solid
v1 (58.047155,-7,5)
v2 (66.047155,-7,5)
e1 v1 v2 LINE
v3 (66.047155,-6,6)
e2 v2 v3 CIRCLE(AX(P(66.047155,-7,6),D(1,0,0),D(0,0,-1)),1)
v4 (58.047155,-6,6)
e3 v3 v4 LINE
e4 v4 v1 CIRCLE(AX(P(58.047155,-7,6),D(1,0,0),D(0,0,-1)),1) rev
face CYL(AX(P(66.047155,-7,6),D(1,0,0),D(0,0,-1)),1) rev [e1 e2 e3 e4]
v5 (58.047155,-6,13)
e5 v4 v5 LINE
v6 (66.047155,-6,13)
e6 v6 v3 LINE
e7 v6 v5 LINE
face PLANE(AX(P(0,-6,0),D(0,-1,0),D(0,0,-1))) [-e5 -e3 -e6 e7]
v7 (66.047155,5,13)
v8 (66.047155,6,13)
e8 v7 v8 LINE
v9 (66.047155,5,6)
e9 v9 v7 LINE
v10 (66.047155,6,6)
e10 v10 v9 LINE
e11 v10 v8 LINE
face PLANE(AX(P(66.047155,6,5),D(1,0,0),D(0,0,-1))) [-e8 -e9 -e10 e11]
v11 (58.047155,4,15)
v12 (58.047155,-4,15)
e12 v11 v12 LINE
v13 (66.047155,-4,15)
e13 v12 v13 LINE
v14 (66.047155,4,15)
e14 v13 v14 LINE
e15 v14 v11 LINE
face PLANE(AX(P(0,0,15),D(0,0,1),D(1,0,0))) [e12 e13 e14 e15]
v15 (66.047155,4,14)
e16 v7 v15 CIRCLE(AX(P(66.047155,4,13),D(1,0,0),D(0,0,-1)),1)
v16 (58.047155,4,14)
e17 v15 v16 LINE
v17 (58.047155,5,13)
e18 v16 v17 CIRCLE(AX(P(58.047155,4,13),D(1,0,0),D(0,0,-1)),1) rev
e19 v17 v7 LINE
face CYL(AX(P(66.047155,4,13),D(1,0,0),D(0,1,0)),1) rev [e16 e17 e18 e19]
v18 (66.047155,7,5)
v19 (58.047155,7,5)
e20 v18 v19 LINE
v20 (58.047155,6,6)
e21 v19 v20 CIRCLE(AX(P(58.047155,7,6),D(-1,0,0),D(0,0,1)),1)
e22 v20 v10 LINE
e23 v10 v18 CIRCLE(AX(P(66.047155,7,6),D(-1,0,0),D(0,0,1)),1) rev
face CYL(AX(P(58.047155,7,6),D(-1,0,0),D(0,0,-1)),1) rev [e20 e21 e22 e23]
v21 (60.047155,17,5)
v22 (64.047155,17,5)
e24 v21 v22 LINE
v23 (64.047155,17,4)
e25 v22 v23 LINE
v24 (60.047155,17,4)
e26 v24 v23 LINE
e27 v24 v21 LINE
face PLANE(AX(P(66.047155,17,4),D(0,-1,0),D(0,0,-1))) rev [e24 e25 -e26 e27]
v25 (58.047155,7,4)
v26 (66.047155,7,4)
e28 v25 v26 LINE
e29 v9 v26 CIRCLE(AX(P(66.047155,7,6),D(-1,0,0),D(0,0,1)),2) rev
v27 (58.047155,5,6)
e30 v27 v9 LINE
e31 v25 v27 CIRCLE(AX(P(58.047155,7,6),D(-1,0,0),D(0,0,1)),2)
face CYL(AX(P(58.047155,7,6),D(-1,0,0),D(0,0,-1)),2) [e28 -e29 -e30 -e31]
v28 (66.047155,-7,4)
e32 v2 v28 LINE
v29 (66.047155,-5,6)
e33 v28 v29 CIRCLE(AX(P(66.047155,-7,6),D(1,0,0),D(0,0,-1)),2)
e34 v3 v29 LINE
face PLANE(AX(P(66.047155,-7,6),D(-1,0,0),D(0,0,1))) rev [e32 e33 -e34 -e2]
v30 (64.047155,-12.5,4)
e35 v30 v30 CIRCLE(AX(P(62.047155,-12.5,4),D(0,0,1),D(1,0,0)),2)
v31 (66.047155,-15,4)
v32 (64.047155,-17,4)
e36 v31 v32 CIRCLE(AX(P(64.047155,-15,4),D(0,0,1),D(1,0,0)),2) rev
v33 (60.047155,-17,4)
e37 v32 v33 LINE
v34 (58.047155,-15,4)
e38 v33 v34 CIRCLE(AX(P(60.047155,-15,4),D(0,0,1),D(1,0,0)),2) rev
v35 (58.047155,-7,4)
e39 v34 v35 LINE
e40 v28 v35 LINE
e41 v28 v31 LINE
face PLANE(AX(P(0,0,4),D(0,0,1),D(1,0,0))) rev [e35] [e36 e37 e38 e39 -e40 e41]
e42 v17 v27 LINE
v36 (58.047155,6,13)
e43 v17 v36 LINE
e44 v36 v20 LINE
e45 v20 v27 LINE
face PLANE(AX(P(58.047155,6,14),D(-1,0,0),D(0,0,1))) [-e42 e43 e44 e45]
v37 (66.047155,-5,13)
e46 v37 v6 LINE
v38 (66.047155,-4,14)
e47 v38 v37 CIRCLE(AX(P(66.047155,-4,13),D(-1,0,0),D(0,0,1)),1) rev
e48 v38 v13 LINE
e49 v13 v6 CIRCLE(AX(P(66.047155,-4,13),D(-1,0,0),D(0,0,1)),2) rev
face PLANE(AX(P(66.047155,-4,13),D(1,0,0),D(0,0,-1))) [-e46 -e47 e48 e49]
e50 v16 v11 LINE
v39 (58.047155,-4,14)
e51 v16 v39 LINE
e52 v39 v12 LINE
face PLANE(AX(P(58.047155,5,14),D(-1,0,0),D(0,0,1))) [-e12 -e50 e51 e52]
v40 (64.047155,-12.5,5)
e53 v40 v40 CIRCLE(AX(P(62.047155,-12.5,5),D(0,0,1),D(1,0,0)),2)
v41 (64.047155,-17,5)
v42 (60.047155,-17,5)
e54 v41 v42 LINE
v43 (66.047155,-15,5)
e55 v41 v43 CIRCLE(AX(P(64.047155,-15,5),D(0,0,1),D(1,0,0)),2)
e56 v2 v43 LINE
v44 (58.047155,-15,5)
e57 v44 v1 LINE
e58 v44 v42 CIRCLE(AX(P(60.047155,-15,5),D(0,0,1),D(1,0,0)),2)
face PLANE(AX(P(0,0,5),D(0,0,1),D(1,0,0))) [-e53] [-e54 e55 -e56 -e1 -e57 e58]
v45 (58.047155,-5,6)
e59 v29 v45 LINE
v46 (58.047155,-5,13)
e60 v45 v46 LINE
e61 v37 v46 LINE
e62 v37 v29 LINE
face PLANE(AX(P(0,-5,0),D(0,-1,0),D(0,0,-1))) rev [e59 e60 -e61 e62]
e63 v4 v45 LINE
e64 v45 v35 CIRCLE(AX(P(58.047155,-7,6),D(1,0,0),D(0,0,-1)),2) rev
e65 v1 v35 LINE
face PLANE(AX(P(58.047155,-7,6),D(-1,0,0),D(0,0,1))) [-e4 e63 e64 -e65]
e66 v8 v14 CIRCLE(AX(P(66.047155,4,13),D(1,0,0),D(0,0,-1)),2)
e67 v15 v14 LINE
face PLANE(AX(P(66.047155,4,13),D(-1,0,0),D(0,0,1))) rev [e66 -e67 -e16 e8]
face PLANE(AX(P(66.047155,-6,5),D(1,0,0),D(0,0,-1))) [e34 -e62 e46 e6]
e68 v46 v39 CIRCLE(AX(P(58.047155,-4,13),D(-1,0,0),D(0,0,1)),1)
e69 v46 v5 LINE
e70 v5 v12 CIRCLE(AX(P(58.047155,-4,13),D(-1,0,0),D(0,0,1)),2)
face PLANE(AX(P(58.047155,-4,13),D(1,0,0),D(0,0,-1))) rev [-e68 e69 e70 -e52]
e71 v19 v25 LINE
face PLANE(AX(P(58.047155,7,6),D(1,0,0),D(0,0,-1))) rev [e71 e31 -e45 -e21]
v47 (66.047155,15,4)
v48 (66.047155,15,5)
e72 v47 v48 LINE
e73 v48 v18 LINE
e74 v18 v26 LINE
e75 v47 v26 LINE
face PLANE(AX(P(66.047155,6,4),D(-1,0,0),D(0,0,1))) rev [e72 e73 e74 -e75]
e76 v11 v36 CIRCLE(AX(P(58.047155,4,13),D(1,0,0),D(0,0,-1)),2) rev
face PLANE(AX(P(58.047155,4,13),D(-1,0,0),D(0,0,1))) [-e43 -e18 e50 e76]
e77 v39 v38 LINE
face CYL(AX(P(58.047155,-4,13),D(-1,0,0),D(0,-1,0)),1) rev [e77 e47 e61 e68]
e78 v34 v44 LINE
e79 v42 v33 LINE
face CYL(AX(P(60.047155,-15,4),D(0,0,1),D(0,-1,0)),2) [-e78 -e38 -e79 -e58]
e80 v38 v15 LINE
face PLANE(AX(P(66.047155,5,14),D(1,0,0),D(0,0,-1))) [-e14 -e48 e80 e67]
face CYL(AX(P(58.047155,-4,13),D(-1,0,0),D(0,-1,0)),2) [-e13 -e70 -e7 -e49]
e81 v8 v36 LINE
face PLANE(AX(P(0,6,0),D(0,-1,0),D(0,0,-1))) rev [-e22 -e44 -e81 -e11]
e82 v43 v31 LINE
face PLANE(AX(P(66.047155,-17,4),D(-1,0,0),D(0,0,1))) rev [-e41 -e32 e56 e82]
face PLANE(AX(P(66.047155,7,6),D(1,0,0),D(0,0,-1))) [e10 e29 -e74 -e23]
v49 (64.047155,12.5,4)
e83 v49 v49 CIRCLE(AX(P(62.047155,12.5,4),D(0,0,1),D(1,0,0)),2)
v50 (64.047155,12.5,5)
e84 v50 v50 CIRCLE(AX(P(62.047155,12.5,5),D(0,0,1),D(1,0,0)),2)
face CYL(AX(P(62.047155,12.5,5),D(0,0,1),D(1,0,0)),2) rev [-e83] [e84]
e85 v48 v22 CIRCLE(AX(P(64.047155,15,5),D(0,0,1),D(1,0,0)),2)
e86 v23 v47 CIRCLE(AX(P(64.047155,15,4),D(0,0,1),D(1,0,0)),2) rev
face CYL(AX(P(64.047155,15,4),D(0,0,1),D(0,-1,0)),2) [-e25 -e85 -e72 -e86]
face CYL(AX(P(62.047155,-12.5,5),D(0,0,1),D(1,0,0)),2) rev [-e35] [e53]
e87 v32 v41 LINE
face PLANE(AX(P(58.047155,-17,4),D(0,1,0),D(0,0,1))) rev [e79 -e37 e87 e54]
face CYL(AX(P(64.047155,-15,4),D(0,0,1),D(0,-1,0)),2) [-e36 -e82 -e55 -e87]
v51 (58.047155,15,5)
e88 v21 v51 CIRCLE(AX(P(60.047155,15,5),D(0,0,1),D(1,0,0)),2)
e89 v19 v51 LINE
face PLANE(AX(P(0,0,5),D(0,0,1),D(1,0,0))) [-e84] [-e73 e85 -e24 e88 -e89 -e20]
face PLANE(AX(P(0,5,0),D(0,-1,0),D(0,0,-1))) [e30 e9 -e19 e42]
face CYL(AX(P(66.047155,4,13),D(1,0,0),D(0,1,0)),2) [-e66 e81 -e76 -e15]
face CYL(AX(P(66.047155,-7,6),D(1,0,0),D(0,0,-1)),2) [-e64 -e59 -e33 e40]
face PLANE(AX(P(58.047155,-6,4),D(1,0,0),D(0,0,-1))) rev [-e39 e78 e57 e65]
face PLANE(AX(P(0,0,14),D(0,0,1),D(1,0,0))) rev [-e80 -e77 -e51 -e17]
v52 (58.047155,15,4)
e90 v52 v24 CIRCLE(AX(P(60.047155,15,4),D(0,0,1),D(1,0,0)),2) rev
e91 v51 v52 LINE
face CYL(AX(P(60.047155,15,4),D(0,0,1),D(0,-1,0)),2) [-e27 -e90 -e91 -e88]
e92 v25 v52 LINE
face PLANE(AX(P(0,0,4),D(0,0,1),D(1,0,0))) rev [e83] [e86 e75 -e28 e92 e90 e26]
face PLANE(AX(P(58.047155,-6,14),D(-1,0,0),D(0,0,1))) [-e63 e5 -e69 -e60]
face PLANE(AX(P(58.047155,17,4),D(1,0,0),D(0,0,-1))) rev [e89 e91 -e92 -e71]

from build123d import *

# Parameters (mm, degrees)
SKETCH_3_W                         = 8
SKETCH_3_H                         = 10
SM_BASE_FLANGE_1_DEPTH             = 1
SM_EDGE_FLANGE_1_STRIP_W           = 6
SM_EDGE_FLANGE_1_STRIP_H           = 1
SM_EDGE_FLANGE_1_STRIP_CUT_DEPTH   = 8
SM_EDGE_FLANGE_1_STRIP_2_W         = 6
SM_EDGE_FLANGE_1_STRIP_2_H         = 1
SM_EDGE_FLANGE_1_STRIP_CUT_2_DEPTH = 8
SM_EDGE_FLANGE_1_DEPTH             = 8
SM_EDGE_FLANGE_1_BEND_DEPTH        = 8
SM_EDGE_FLANGE_2_STRIP_W           = 6
SM_EDGE_FLANGE_2_STRIP_H           = 1
SM_EDGE_FLANGE_2_STRIP_CUT_DEPTH   = 8
SM_EDGE_FLANGE_2_DEPTH             = 8
SM_EDGE_FLANGE_3_STRIP_W           = 6
SM_EDGE_FLANGE_3_STRIP_H           = 1
SM_EDGE_FLANGE_3_STRIP_CUT_DEPTH   = 8
SM_EDGE_FLANGE_3_DEPTH             = 8
FILLET_1_R                         = 2
HOLE_WIZARD_4_0_4_1_D              = 4


# Sheet-metal steps are written as plain solids
with BuildPart() as part:
    # 草图3 → 基体-法兰1 (new body)
    with BuildSketch(Plane.XY.offset(15)):
        with Locations((62.047155018, 0)):
            Rectangle(SKETCH_3_W, SKETCH_3_H)
    extrude(amount=-SM_BASE_FLANGE_1_DEPTH)

    # 边线-法兰1 strip (across the edge) → 边线-法兰1 strip cut (cut)
    with BuildSketch(Plane(origin=(66.047155018, -5, 14), x_dir=(0, 1, 0), z_dir=(-1, 0, 0))):
        with Locations((-2, -0.5)):
            Rectangle(SM_EDGE_FLANGE_1_STRIP_W, SM_EDGE_FLANGE_1_STRIP_H)
    extrude(amount=SM_EDGE_FLANGE_1_STRIP_CUT_DEPTH, mode=Mode.SUBTRACT)

    # 边线-法兰1 strip 2 (across the edge) → 边线-法兰1 strip cut 2 (cut)
    with BuildSketch(Plane(origin=(58.047155018, 5, 14), x_dir=(0, -1, 0), z_dir=(1, 0, 0))):
        with Locations((-2, -0.5)):
            Rectangle(SM_EDGE_FLANGE_1_STRIP_2_W, SM_EDGE_FLANGE_1_STRIP_2_H)
    extrude(amount=SM_EDGE_FLANGE_1_STRIP_CUT_2_DEPTH, mode=Mode.SUBTRACT)

    # 边线-法兰1 section (across the edge) → 边线-法兰1 (add)
    with BuildSketch(Plane(origin=(66.047155018, -5, 14), x_dir=(0, 1, 0), z_dir=(-1, 0, 0))):
        with BuildLine():
            Line((-1, 1), (-1, 9))
            Line((-1, 9), (0, 9))
            Line((0, 9), (0, 1))
            ThreePointArc((0, 1), (0.292893219, 0.292893219), (1, 0))
            Line((1, 0), (1, -1))
            ThreePointArc((1, -1), (-0.414213562, -0.414213562), (-1, 1))
        make_face()
    extrude(amount=SM_EDGE_FLANGE_1_DEPTH)

    # 边线-法兰1 section 2 (across the edge) → 边线-法兰1 bend (add)
    with BuildSketch(Plane(origin=(58.047155018, 5, 14), x_dir=(0, -1, 0), z_dir=(1, 0, 0))):
        with BuildLine():
            Line((-1, 1), (-1, 9))
            Line((-1, 9), (0, 9))
            Line((0, 9), (0, 1))
            ThreePointArc((0, 1), (0.292893219, 0.292893219), (1, 0))
            Line((1, 0), (1, -1))
            ThreePointArc((1, -1), (-0.414213562, -0.414213562), (-1, 1))
        make_face()
    extrude(amount=SM_EDGE_FLANGE_1_BEND_DEPTH)

    # 边线-法兰2 strip (across the edge) → 边线-法兰2 strip cut (cut)
    with BuildSketch(Plane(origin=(58.047155018, -6, 5), x_dir=(0, 0, 1), z_dir=(1, 0, 0))):
        with Locations((-2, -0.5)):
            Rectangle(SM_EDGE_FLANGE_2_STRIP_W, SM_EDGE_FLANGE_2_STRIP_H)
    extrude(amount=SM_EDGE_FLANGE_2_STRIP_CUT_DEPTH, mode=Mode.SUBTRACT)

    # 边线-法兰2 section (across the edge) → 边线-法兰2 (add)
    with BuildSketch(Plane(origin=(58.047155018, -6, 5), x_dir=(0, 0, 1), z_dir=(1, 0, 0))):
        with BuildLine():
            Line((-1, 1), (-1, 11))
            Line((-1, 11), (0, 11))
            Line((0, 11), (0, 1))
            ThreePointArc((0, 1), (0.292893219, 0.292893219), (1, 0))
            Line((1, 0), (1, -1))
            ThreePointArc((1, -1), (-0.414213562, -0.414213562), (-1, 1))
        make_face()
    extrude(amount=SM_EDGE_FLANGE_2_DEPTH)

    # 边线-法兰3 strip (across the edge) → 边线-法兰3 strip cut (cut)
    with BuildSketch(Plane(origin=(66.047155018, 6, 5), x_dir=(0, 0, 1), z_dir=(-1, 0, 0))):
        with Locations((-2, -0.5)):
            Rectangle(SM_EDGE_FLANGE_3_STRIP_W, SM_EDGE_FLANGE_3_STRIP_H)
    extrude(amount=SM_EDGE_FLANGE_3_STRIP_CUT_DEPTH, mode=Mode.SUBTRACT)

    # 边线-法兰3 section (across the edge) → 边线-法兰3 (add)
    with BuildSketch(Plane(origin=(66.047155018, 6, 5), x_dir=(0, 0, 1), z_dir=(-1, 0, 0))):
        with BuildLine():
            Line((-1, 1), (-1, 11))
            Line((-1, 11), (0, 11))
            Line((0, 11), (0, 1))
            ThreePointArc((0, 1), (0.292893219, 0.292893219), (1, 0))
            Line((1, 0), (1, -1))
            ThreePointArc((1, -1), (-0.414213562, -0.414213562), (-1, 1))
        make_face()
    extrude(amount=SM_EDGE_FLANGE_3_DEPTH)

    # 圆角1
    fillet_1_edges = [part.edges().sort_by_distance(p)[0] for p in [
        (58.047155018, -17, 4.5),
        (66.047155018, -17, 4.5),
        (66.047155018, 17, 4.5),
        (58.047155018, 17, 4.5),
    ]]
    fillet(fillet_1_edges, radius=FILLET_1_R)

    # Ø4.0 (4) 直径孔1 (through all)
    with Locations(Plane.XY.offset(5)):
        with Locations((62.047155018, 12.5), (62.047155018, -12.5)):
            Hole(HOLE_WIZARD_4_0_4_1_D / 2)


solid = part.part
